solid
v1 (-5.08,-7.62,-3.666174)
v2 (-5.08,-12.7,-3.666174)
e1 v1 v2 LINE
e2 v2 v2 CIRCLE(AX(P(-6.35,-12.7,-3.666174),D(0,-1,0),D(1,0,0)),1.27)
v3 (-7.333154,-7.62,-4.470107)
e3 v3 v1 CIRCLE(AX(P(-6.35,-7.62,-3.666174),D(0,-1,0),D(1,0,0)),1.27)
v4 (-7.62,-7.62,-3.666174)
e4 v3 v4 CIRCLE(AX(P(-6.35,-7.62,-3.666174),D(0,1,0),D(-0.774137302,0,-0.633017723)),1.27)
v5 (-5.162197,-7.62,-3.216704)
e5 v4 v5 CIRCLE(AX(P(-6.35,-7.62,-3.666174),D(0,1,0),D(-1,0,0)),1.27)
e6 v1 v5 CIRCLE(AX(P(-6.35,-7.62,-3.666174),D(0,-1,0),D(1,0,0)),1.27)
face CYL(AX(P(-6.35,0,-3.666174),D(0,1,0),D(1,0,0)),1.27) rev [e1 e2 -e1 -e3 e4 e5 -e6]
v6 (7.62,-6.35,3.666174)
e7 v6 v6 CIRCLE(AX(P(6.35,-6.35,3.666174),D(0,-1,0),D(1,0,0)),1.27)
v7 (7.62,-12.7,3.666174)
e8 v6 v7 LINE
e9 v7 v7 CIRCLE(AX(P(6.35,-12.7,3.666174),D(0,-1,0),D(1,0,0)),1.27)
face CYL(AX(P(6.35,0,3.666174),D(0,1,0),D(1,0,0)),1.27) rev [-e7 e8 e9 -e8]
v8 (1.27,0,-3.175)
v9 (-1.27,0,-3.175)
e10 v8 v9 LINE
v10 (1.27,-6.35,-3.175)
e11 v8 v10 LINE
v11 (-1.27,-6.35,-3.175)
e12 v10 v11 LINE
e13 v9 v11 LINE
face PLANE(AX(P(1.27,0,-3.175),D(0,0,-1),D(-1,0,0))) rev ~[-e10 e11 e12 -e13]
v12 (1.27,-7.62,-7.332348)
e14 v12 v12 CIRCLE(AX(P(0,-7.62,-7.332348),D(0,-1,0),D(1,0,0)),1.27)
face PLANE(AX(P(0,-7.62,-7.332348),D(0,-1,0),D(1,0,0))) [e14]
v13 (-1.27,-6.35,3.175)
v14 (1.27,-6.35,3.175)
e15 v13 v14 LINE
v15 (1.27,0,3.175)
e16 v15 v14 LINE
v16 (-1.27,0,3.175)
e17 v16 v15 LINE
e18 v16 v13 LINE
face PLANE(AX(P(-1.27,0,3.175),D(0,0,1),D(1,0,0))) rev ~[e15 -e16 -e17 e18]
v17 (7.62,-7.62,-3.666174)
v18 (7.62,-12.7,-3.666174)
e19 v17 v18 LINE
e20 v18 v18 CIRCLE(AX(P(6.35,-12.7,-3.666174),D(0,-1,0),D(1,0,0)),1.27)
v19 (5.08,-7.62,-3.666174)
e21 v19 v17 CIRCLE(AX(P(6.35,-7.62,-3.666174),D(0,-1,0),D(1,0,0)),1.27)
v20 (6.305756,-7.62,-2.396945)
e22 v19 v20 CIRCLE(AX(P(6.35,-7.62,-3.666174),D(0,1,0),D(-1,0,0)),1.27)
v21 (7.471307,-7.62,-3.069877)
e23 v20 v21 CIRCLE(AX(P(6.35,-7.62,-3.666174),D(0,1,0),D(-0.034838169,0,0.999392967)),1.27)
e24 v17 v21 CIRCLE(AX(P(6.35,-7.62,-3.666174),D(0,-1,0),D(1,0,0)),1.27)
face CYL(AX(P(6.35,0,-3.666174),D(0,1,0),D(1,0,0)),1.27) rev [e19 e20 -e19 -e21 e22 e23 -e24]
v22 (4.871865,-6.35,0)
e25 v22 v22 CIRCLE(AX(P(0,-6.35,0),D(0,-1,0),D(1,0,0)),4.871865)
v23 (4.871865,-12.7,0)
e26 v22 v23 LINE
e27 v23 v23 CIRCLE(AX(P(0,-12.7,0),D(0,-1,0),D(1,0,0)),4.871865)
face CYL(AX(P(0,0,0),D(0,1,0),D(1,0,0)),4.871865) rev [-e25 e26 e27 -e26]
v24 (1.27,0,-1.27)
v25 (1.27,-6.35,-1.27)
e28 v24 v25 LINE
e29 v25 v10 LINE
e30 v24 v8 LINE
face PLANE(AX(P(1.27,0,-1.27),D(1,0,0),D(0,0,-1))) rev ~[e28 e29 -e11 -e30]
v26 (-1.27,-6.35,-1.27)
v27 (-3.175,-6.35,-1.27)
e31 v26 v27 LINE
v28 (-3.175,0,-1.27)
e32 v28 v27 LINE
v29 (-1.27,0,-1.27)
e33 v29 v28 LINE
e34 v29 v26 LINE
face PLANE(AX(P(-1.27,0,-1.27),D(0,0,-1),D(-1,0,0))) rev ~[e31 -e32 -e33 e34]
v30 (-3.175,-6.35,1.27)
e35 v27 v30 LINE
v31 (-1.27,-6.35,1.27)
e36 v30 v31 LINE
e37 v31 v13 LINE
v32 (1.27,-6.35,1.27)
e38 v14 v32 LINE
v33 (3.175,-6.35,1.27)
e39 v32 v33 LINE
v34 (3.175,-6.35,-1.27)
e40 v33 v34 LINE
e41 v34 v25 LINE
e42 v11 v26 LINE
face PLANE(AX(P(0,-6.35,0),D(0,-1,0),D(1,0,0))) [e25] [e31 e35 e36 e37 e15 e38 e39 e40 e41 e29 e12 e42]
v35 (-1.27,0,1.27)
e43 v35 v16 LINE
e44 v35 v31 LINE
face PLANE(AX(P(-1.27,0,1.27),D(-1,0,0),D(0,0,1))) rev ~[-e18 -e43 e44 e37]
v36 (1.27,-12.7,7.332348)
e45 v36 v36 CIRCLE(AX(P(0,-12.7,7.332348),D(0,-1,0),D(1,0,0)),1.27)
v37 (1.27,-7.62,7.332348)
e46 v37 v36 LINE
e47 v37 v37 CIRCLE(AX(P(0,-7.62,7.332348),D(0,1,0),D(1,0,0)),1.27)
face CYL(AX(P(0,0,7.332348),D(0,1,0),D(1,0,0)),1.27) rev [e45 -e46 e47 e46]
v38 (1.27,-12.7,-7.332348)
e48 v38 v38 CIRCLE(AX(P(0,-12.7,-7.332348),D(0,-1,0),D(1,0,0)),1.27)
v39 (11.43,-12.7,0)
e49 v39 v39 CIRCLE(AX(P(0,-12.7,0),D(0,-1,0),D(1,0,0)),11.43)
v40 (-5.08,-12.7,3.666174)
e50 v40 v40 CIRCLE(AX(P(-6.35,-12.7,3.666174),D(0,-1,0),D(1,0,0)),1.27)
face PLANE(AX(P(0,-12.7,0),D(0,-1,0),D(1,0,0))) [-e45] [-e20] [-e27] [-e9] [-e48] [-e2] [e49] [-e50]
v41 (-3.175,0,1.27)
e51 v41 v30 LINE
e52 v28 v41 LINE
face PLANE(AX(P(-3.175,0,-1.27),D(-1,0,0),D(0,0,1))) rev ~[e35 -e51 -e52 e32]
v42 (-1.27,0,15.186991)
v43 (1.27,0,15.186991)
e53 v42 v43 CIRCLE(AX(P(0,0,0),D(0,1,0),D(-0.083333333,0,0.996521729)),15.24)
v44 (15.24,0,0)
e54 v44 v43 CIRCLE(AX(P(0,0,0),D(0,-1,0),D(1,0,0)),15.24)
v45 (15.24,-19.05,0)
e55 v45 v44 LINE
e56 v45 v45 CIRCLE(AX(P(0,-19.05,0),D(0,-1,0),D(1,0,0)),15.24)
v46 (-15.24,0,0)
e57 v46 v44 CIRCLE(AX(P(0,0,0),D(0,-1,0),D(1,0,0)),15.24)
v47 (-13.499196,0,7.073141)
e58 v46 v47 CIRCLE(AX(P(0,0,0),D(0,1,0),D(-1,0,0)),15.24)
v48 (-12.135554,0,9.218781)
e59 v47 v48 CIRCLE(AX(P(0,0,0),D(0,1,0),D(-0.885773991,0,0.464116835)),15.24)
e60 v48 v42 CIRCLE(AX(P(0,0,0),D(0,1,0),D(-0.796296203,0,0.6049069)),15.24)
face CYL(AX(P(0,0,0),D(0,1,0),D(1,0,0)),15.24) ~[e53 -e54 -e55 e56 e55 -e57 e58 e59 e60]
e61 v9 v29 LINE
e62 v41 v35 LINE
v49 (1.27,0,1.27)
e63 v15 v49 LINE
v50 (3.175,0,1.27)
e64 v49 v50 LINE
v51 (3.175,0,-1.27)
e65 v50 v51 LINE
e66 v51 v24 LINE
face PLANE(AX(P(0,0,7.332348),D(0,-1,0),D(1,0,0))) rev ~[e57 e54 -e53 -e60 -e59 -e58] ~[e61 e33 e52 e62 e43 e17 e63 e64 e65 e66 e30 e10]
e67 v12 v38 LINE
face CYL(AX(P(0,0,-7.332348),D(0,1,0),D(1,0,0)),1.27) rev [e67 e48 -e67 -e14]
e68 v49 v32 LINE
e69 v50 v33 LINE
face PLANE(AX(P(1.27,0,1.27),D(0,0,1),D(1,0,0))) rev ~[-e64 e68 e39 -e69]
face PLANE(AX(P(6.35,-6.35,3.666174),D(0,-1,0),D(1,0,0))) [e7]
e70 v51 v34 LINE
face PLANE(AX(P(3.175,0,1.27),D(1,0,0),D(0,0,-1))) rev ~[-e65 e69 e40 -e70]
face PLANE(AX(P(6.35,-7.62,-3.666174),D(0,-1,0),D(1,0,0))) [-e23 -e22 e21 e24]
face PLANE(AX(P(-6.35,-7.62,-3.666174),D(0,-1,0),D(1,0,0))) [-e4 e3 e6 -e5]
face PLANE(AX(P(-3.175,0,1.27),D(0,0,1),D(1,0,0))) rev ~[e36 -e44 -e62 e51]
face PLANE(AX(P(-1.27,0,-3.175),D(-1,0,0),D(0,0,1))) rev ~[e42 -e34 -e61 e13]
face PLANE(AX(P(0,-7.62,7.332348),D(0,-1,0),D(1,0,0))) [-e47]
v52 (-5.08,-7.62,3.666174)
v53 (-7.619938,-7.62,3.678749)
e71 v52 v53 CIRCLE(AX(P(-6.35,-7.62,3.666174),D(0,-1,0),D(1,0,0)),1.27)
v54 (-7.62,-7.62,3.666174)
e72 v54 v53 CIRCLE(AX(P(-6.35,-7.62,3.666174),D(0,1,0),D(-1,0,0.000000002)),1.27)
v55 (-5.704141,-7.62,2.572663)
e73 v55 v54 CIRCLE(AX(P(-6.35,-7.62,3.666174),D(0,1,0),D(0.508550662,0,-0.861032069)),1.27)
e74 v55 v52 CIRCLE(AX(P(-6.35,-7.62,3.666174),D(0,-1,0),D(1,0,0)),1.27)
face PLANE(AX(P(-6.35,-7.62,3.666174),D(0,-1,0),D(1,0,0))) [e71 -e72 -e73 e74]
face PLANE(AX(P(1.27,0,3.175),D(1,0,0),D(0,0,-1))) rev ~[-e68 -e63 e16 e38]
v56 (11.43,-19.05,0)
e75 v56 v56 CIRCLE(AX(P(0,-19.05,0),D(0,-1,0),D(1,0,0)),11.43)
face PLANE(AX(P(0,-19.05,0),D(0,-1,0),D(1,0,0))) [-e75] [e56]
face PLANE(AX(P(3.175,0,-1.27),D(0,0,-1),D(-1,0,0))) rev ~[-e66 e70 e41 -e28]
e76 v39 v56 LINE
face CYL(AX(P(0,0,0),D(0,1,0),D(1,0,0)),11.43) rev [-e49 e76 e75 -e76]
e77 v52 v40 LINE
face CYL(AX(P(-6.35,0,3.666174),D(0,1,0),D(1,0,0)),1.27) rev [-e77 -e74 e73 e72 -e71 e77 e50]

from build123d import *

# Parameters (mm, degrees)
F0_R     = 15.24
F0_R_2   = 12.7
F0_R_3   = 11.43
F1_DEPTH = 19.05
F0_R_4   = 1.27
F0_R_5   = 4.8718647292
F2_DEPTH = 12.7
F3_DEPTH = 6.35
F5_DEPTH = 7.62


# Not quite as in the source:
# - a feature of the source that left no trace in its solid (it failed there, or was rolled back) is left out
# - the program builds the solid bodies; features that only make, move or delete a surface that nothing else refers to are left out


with BuildPart() as f1:
    # F0 (on Front) → F1 (new body)
    with BuildSketch(Plane.XZ):
        Circle(F0_R)
        Circle(F0_R_2, mode=Mode.SUBTRACT)
        Circle(F0_R_2)
        Circle(F0_R_3, mode=Mode.SUBTRACT)
    extrude(amount=F1_DEPTH)

    # F0 (on Front) → F2 (join)
    with BuildSketch(Plane.XZ):
        Circle(F0_R_3)
        with Locations((-6.35, -3.6661742094)):
            Circle(F0_R_4, mode=Mode.SUBTRACT)
        with Locations((0, -7.3323484187)):
            Circle(F0_R_4, mode=Mode.SUBTRACT)
        with Locations((6.35, -3.6661742094)):
            Circle(F0_R_4, mode=Mode.SUBTRACT)
        with Locations((-6.35, 3.6661742094)):
            Circle(F0_R_4, mode=Mode.SUBTRACT)
        Circle(F0_R_5, mode=Mode.SUBTRACT)
        with Locations((6.35, 3.6661742094)):
            Circle(F0_R_4, mode=Mode.SUBTRACT)
        with Locations((0, 7.3323484187)):
            Circle(F0_R_4, mode=Mode.SUBTRACT)
    extrude(amount=F2_DEPTH)

    # F0 (on Front) → F3 (join)
    with BuildSketch(Plane.XZ):
        Circle(F0_R_5)
        Polygon((3.175, 1.27), (3.175, -1.27), (1.27, -1.27), (1.27, -3.175), (-1.27, -3.175), (-1.27, -1.27), (-3.175, -1.27), (-3.175, 1.27), (-1.27, 1.27), (-1.27, 3.175), (1.27, 3.175), (1.27, 1.27), align=None, mode=Mode.SUBTRACT)
        with Locations((6.35, 3.6661742094)):
            Circle(F0_R_4)
    extrude(amount=F3_DEPTH)

    # F0 (on Front) + F4 (on face) → F5 (join)
    with BuildSketch(Plane.XZ):
        with Locations((0, 7.3323484187)):
            Circle(F0_R_4)
        with Locations((6.35, -3.6661742094)):
            Circle(F0_R_4)
        with Locations((0, -7.3323484187)):
            Circle(F0_R_4)
        with Locations((-6.35, -3.6661742094)):
            Circle(F0_R_4)
        with Locations((-6.35, 3.6661742094)):
            Circle(F0_R_4)
    with BuildSketch(Plane(origin=(0, 0, 0), x_dir=(-1, 0, 0), z_dir=(0, 1, 0))):
        with BuildLine():
            ThreePointArc((-1.27, 7.3323484187), (0, 6.0623484187), (1.27, 7.3323484187))
            ThreePointArc((1.27, 7.3323484187), (0, 8.6023484187), (-1.27, 7.3323484187))
        make_face()
        with BuildLine():
            ThreePointArc((7.61993774, 3.678749442), (5.715, 4.7660264722), (5.7041406591, 2.5726634816))
            Line((5.7041406591, 2.5726634816), (7.61993774, 3.678749442))
        make_face()
        with BuildLine():
            Line((7.61993774, 3.678749442), (5.7041406591, 2.5726634816))
            ThreePointArc((5.7041406591, 2.5726634816), (6.9795469153, 2.5631915796), (7.62, 3.6661742094))
            ThreePointArc((7.62, 3.6661742094), (7.6199844349, 3.6724619027), (7.61993774, 3.678749442))
        make_face()
        with BuildLine():
            ThreePointArc((-1.27, 12.6363404513), (0, 12.7), (1.27, 12.6363404513))
            Line((1.27, 12.6363404513), (1.27, 15.1869911437))
            ThreePointArc((1.27, 15.1869911437), (0, 15.24), (-1.27, 15.1869911437))
            Line((-1.27, 15.1869911437), (-1.27, 12.6363404513))
        make_face()
        with BuildLine():
            Line((1.27, 15.1869911437), (1.27, 12.6363404513))
            ThreePointArc((1.27, 12.6363404513), (6.0659933949, 11.1576755703), (9.9146853041, 7.9365619333))
            Line((9.9146853041, 7.9365619333), (12.1355541331, 9.2187811496))
            ThreePointArc((12.1355541331, 9.2187811496), (7.3370363933, 13.3576007188), (1.27, 15.1869911437))
        make_face()
        with BuildLine():
            ThreePointArc((-11.4830868745, 5.4248240371), (-10.8829390696, 6.5461161927), (-10.1736532809, 7.6017615668))
            ThreePointArc((-10.1736532809, 7.6017615668), (-6.2510836052, 11.0550420063), (-1.27, 12.6363404513))
            Line((-1.27, 12.6363404513), (-1.27, 15.1869911437))
            ThreePointArc((-1.27, 15.1869911437), (-10.3175287739, -11.2163363002), (15.24, 0))
            ThreePointArc((15.24, 0), (14.7984009497, 3.6421050686), (13.4991956259, 7.0731405651))
            Line((13.4991956259, 7.0731405651), (11.2972745003, 5.8018608105))
            ThreePointArc((11.2972745003, 5.8018608105), (12.344338503, 2.9845111698), (12.7, 0))
            ThreePointArc((12.7, 0), (12.5183628333, -2.1402317572), (11.9786469332, -4.2192437297))
            ThreePointArc((11.9786469332, -4.2192437297), (11.4947402206, -5.4000877087), (10.8947701838, -6.5264065642))
            ThreePointArc((10.8947701838, -6.5264065642), (7.1599884636, -10.4892595163), (2.108859222, -12.5236860701))
            ThreePointArc((2.108859222, -12.5236860701), (0.843104089, -12.6719838816), (-0.431140778, -12.6926796867))
            ThreePointArc((-0.431140778, -12.6926796867), (-5.8966986399, -11.2480640623), (-10.1938394294, -7.5746707973))
            ThreePointArc((-10.1938394294, -7.5746707973), (-10.9002856113, -6.5171906211), (-11.4974295134, -5.3943595157))
            ThreePointArc((-11.4974295134, -5.3943595157), (-12.6999888406, 0.0168359612), (-11.4830868745, 5.4248240371))
        make_face()
        with BuildLine():
            Line((12.1355541331, 9.2187811496), (9.9146853041, 7.9365619333))
            ThreePointArc((9.9146853041, 7.9365619333), (10.6595519093, 6.9039085374), (11.2972745003, 5.8018608105))
            Line((11.2972745003, 5.8018608105), (13.4991956259, 7.0731405651))
            ThreePointArc((13.4991956259, 7.0731405651), (12.8621942988, 8.1744454135), (12.1355541331, 9.2187811496))
        make_face()
        with BuildLine():
            ThreePointArc((7.62, -3.6661742094), (6.5784622338, -2.4168924126), (5.1621968382, -3.2167038))
            Line((5.1621968382, -3.2167038), (7.3331543737, -4.4701067174))
            ThreePointArc((7.3331543737, -4.4701067174), (7.5461408894, -4.0929610094), (7.62, -3.6661742094))
        make_face()
        with BuildLine():
            Line((7.3331543737, -4.4701067174), (5.1621968382, -3.2167038))
            ThreePointArc((5.1621968382, -3.2167038), (5.715, -4.7660264722), (7.3331543737, -4.4701067174))
        make_face()
        with BuildLine():
            ThreePointArc((-5.08, -3.6661742094), (-5.4364655228, -2.7839300487), (-6.305755526, -2.3969451416))
            Line((-6.305755526, -2.3969451416), (-7.4713068529, -3.0698765139))
            ThreePointArc((-7.4713068529, -3.0698765139), (-6.6572786169, -4.8984403541), (-5.08, -3.6661742094))
        make_face()
        with BuildLine():
            Line((-7.4713068529, -3.0698765139), (-6.305755526, -2.3969451416))
            ThreePointArc((-6.305755526, -2.3969451416), (-6.985, -2.5663219465), (-7.4713068529, -3.0698765139))
        make_face()
    extrude(amount=F5_DEPTH, dir=(0, -1, 0))


solid = f1.part
